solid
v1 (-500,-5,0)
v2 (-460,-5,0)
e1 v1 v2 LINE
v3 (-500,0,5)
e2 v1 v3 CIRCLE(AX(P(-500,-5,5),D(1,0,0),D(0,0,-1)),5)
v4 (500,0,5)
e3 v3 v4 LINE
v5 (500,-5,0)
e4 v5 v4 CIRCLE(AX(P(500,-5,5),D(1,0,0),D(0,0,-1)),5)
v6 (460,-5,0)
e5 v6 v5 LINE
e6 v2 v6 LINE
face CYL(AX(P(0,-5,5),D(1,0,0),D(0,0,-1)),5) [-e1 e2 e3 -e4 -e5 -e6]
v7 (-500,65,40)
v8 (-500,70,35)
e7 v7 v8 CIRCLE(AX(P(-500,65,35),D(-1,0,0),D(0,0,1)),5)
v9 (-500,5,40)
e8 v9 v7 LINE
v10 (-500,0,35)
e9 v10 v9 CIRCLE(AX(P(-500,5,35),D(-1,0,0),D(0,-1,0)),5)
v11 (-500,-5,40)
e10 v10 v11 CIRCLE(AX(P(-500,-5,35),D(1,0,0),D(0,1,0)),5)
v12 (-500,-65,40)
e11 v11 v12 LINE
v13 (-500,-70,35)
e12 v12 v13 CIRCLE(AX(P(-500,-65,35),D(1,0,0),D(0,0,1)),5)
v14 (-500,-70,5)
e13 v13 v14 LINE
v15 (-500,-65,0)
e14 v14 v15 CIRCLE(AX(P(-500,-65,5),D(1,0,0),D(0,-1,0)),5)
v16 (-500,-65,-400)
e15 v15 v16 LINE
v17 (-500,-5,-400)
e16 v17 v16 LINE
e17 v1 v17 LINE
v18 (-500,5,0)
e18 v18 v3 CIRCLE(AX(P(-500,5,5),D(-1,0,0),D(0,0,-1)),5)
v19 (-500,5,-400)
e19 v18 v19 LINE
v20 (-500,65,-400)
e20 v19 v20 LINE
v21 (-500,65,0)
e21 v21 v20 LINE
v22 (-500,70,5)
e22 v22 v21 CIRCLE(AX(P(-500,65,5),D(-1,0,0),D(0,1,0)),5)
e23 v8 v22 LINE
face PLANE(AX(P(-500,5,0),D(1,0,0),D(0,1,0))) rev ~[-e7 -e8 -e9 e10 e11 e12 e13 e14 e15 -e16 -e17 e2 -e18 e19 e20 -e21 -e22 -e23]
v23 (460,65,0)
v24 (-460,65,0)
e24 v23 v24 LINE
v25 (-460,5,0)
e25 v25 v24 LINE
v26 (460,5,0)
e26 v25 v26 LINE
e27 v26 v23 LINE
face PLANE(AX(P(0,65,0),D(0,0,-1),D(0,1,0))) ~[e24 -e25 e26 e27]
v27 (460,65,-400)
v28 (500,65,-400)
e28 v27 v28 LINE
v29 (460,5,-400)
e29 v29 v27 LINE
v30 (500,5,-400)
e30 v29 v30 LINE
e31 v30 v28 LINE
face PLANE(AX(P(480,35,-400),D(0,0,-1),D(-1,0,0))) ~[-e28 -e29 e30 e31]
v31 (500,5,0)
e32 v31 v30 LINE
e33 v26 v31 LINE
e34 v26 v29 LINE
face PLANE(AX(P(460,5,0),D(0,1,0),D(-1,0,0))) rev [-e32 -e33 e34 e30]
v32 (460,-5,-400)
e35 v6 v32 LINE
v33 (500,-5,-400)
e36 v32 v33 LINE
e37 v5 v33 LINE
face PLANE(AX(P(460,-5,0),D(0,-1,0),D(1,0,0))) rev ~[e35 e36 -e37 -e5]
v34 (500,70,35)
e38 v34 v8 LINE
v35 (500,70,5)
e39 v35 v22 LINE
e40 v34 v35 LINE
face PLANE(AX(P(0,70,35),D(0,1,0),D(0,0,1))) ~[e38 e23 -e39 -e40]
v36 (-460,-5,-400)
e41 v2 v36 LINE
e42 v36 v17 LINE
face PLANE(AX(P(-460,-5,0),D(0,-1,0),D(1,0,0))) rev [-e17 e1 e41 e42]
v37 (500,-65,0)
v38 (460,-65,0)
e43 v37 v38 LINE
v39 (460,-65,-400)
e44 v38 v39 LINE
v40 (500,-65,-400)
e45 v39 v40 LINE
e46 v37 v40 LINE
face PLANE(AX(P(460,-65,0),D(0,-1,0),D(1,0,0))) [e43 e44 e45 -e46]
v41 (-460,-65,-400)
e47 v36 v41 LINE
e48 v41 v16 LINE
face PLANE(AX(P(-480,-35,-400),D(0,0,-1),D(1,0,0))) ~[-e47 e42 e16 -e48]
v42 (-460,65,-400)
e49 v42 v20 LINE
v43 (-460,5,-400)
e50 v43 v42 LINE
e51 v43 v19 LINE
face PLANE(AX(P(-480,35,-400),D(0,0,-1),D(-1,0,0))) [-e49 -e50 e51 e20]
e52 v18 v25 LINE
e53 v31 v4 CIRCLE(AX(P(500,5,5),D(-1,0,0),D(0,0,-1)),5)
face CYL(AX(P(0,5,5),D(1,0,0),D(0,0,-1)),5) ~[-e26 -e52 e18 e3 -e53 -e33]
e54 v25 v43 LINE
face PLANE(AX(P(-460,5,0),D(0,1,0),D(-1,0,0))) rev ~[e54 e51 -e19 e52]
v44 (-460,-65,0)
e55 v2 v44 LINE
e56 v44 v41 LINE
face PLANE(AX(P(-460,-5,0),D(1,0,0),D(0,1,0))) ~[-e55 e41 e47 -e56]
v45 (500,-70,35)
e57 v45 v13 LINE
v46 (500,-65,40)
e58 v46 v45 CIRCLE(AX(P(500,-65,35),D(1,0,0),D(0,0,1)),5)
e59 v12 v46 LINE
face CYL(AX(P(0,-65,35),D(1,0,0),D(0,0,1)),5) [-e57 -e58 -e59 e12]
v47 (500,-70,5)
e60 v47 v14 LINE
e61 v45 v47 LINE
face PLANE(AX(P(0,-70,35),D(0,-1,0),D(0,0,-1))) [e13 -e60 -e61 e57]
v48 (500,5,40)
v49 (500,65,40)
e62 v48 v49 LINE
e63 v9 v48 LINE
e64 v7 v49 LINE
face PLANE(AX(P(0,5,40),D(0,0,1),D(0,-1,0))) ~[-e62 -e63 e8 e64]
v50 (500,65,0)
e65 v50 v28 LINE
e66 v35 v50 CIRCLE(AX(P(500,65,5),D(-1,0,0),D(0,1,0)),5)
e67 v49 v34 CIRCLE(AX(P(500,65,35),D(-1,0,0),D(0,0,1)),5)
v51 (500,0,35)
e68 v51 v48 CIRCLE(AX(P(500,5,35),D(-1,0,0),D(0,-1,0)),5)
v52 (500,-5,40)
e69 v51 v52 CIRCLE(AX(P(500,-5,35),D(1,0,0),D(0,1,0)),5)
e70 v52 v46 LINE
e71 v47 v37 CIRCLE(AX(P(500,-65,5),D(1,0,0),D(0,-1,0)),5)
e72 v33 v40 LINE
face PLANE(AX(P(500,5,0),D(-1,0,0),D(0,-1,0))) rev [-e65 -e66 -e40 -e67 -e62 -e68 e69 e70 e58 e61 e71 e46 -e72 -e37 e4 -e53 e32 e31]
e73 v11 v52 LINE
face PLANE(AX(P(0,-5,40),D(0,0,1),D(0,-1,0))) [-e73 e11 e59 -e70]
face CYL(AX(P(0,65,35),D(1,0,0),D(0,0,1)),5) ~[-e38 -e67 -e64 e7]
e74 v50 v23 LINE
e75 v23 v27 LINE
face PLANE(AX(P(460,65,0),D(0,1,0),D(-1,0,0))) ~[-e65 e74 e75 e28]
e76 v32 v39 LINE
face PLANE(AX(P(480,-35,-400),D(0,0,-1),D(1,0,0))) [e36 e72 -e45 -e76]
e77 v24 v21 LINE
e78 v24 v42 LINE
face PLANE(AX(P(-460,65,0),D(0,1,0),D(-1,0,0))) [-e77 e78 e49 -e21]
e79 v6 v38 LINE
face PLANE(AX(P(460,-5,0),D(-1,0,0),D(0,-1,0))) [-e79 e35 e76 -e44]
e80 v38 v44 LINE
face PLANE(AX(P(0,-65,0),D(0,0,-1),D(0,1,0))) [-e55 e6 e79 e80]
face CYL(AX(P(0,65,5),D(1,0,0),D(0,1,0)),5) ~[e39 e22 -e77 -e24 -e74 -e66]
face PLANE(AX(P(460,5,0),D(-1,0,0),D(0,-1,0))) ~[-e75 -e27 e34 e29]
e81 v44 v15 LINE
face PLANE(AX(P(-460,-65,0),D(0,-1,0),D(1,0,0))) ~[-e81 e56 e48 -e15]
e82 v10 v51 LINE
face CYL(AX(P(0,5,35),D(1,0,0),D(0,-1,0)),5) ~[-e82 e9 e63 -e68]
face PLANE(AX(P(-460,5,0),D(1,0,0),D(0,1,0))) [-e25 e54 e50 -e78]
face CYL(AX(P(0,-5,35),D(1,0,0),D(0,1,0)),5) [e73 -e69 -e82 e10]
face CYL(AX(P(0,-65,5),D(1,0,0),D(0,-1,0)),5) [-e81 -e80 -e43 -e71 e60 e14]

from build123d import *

# Parameters (mm, degrees)
F1_DEPTH = 500
F2_W     = 40
F2_H     = 60
F3_DEPTH = 400


# Not quite as in the source:
# - a pattern or mirror of a feature is missing from the dataset's text; its kind, count and spacing are read off the source's solid


with BuildPart() as f1:
    # F0 (on Right) → F1 (new body, symmetric)
    with BuildSketch(Plane.YZ):
        with BuildLine():
            Line((-65, 0), (-5, 0))
            ThreePointArc((-5, 0), (-1.4644660941, 1.4644660941), (0, 5))
            Line((0, 5), (0, 35))
            ThreePointArc((0, 35), (-1.4644660941, 38.5355339059), (-5, 40))
            Line((-5, 40), (-65, 40))
            ThreePointArc((-65, 40), (-68.5355339059, 38.5355339059), (-70, 35))
            Line((-70, 35), (-70, 5))
            ThreePointArc((-70, 5), (-68.5355339059, 1.4644660941), (-65, 0))
        make_face()
    extrude(amount=F1_DEPTH, both=True)

    # F2 (on face) → F3 (join)
    with BuildSketch(Plane(origin=(0, 0, 0), x_dir=(1, 0, 0), z_dir=(0, 0, -1))):
        with Locations((480, 35)):
            Rectangle(F2_W, F2_H)
    f3 = extrude(amount=F3_DEPTH)

    # F3_copies: F3 across plane
    add(f3.mirror(Plane(origin=(0, 0, 0), x_dir=(0, 0, -1), z_dir=(-1, 0, 0))))

    # F4: F1 across plane


with BuildPart() as f1_1:
    add(f1.part)
    add(f1.part.mirror(Plane.XZ))


solid = f1_1.part
